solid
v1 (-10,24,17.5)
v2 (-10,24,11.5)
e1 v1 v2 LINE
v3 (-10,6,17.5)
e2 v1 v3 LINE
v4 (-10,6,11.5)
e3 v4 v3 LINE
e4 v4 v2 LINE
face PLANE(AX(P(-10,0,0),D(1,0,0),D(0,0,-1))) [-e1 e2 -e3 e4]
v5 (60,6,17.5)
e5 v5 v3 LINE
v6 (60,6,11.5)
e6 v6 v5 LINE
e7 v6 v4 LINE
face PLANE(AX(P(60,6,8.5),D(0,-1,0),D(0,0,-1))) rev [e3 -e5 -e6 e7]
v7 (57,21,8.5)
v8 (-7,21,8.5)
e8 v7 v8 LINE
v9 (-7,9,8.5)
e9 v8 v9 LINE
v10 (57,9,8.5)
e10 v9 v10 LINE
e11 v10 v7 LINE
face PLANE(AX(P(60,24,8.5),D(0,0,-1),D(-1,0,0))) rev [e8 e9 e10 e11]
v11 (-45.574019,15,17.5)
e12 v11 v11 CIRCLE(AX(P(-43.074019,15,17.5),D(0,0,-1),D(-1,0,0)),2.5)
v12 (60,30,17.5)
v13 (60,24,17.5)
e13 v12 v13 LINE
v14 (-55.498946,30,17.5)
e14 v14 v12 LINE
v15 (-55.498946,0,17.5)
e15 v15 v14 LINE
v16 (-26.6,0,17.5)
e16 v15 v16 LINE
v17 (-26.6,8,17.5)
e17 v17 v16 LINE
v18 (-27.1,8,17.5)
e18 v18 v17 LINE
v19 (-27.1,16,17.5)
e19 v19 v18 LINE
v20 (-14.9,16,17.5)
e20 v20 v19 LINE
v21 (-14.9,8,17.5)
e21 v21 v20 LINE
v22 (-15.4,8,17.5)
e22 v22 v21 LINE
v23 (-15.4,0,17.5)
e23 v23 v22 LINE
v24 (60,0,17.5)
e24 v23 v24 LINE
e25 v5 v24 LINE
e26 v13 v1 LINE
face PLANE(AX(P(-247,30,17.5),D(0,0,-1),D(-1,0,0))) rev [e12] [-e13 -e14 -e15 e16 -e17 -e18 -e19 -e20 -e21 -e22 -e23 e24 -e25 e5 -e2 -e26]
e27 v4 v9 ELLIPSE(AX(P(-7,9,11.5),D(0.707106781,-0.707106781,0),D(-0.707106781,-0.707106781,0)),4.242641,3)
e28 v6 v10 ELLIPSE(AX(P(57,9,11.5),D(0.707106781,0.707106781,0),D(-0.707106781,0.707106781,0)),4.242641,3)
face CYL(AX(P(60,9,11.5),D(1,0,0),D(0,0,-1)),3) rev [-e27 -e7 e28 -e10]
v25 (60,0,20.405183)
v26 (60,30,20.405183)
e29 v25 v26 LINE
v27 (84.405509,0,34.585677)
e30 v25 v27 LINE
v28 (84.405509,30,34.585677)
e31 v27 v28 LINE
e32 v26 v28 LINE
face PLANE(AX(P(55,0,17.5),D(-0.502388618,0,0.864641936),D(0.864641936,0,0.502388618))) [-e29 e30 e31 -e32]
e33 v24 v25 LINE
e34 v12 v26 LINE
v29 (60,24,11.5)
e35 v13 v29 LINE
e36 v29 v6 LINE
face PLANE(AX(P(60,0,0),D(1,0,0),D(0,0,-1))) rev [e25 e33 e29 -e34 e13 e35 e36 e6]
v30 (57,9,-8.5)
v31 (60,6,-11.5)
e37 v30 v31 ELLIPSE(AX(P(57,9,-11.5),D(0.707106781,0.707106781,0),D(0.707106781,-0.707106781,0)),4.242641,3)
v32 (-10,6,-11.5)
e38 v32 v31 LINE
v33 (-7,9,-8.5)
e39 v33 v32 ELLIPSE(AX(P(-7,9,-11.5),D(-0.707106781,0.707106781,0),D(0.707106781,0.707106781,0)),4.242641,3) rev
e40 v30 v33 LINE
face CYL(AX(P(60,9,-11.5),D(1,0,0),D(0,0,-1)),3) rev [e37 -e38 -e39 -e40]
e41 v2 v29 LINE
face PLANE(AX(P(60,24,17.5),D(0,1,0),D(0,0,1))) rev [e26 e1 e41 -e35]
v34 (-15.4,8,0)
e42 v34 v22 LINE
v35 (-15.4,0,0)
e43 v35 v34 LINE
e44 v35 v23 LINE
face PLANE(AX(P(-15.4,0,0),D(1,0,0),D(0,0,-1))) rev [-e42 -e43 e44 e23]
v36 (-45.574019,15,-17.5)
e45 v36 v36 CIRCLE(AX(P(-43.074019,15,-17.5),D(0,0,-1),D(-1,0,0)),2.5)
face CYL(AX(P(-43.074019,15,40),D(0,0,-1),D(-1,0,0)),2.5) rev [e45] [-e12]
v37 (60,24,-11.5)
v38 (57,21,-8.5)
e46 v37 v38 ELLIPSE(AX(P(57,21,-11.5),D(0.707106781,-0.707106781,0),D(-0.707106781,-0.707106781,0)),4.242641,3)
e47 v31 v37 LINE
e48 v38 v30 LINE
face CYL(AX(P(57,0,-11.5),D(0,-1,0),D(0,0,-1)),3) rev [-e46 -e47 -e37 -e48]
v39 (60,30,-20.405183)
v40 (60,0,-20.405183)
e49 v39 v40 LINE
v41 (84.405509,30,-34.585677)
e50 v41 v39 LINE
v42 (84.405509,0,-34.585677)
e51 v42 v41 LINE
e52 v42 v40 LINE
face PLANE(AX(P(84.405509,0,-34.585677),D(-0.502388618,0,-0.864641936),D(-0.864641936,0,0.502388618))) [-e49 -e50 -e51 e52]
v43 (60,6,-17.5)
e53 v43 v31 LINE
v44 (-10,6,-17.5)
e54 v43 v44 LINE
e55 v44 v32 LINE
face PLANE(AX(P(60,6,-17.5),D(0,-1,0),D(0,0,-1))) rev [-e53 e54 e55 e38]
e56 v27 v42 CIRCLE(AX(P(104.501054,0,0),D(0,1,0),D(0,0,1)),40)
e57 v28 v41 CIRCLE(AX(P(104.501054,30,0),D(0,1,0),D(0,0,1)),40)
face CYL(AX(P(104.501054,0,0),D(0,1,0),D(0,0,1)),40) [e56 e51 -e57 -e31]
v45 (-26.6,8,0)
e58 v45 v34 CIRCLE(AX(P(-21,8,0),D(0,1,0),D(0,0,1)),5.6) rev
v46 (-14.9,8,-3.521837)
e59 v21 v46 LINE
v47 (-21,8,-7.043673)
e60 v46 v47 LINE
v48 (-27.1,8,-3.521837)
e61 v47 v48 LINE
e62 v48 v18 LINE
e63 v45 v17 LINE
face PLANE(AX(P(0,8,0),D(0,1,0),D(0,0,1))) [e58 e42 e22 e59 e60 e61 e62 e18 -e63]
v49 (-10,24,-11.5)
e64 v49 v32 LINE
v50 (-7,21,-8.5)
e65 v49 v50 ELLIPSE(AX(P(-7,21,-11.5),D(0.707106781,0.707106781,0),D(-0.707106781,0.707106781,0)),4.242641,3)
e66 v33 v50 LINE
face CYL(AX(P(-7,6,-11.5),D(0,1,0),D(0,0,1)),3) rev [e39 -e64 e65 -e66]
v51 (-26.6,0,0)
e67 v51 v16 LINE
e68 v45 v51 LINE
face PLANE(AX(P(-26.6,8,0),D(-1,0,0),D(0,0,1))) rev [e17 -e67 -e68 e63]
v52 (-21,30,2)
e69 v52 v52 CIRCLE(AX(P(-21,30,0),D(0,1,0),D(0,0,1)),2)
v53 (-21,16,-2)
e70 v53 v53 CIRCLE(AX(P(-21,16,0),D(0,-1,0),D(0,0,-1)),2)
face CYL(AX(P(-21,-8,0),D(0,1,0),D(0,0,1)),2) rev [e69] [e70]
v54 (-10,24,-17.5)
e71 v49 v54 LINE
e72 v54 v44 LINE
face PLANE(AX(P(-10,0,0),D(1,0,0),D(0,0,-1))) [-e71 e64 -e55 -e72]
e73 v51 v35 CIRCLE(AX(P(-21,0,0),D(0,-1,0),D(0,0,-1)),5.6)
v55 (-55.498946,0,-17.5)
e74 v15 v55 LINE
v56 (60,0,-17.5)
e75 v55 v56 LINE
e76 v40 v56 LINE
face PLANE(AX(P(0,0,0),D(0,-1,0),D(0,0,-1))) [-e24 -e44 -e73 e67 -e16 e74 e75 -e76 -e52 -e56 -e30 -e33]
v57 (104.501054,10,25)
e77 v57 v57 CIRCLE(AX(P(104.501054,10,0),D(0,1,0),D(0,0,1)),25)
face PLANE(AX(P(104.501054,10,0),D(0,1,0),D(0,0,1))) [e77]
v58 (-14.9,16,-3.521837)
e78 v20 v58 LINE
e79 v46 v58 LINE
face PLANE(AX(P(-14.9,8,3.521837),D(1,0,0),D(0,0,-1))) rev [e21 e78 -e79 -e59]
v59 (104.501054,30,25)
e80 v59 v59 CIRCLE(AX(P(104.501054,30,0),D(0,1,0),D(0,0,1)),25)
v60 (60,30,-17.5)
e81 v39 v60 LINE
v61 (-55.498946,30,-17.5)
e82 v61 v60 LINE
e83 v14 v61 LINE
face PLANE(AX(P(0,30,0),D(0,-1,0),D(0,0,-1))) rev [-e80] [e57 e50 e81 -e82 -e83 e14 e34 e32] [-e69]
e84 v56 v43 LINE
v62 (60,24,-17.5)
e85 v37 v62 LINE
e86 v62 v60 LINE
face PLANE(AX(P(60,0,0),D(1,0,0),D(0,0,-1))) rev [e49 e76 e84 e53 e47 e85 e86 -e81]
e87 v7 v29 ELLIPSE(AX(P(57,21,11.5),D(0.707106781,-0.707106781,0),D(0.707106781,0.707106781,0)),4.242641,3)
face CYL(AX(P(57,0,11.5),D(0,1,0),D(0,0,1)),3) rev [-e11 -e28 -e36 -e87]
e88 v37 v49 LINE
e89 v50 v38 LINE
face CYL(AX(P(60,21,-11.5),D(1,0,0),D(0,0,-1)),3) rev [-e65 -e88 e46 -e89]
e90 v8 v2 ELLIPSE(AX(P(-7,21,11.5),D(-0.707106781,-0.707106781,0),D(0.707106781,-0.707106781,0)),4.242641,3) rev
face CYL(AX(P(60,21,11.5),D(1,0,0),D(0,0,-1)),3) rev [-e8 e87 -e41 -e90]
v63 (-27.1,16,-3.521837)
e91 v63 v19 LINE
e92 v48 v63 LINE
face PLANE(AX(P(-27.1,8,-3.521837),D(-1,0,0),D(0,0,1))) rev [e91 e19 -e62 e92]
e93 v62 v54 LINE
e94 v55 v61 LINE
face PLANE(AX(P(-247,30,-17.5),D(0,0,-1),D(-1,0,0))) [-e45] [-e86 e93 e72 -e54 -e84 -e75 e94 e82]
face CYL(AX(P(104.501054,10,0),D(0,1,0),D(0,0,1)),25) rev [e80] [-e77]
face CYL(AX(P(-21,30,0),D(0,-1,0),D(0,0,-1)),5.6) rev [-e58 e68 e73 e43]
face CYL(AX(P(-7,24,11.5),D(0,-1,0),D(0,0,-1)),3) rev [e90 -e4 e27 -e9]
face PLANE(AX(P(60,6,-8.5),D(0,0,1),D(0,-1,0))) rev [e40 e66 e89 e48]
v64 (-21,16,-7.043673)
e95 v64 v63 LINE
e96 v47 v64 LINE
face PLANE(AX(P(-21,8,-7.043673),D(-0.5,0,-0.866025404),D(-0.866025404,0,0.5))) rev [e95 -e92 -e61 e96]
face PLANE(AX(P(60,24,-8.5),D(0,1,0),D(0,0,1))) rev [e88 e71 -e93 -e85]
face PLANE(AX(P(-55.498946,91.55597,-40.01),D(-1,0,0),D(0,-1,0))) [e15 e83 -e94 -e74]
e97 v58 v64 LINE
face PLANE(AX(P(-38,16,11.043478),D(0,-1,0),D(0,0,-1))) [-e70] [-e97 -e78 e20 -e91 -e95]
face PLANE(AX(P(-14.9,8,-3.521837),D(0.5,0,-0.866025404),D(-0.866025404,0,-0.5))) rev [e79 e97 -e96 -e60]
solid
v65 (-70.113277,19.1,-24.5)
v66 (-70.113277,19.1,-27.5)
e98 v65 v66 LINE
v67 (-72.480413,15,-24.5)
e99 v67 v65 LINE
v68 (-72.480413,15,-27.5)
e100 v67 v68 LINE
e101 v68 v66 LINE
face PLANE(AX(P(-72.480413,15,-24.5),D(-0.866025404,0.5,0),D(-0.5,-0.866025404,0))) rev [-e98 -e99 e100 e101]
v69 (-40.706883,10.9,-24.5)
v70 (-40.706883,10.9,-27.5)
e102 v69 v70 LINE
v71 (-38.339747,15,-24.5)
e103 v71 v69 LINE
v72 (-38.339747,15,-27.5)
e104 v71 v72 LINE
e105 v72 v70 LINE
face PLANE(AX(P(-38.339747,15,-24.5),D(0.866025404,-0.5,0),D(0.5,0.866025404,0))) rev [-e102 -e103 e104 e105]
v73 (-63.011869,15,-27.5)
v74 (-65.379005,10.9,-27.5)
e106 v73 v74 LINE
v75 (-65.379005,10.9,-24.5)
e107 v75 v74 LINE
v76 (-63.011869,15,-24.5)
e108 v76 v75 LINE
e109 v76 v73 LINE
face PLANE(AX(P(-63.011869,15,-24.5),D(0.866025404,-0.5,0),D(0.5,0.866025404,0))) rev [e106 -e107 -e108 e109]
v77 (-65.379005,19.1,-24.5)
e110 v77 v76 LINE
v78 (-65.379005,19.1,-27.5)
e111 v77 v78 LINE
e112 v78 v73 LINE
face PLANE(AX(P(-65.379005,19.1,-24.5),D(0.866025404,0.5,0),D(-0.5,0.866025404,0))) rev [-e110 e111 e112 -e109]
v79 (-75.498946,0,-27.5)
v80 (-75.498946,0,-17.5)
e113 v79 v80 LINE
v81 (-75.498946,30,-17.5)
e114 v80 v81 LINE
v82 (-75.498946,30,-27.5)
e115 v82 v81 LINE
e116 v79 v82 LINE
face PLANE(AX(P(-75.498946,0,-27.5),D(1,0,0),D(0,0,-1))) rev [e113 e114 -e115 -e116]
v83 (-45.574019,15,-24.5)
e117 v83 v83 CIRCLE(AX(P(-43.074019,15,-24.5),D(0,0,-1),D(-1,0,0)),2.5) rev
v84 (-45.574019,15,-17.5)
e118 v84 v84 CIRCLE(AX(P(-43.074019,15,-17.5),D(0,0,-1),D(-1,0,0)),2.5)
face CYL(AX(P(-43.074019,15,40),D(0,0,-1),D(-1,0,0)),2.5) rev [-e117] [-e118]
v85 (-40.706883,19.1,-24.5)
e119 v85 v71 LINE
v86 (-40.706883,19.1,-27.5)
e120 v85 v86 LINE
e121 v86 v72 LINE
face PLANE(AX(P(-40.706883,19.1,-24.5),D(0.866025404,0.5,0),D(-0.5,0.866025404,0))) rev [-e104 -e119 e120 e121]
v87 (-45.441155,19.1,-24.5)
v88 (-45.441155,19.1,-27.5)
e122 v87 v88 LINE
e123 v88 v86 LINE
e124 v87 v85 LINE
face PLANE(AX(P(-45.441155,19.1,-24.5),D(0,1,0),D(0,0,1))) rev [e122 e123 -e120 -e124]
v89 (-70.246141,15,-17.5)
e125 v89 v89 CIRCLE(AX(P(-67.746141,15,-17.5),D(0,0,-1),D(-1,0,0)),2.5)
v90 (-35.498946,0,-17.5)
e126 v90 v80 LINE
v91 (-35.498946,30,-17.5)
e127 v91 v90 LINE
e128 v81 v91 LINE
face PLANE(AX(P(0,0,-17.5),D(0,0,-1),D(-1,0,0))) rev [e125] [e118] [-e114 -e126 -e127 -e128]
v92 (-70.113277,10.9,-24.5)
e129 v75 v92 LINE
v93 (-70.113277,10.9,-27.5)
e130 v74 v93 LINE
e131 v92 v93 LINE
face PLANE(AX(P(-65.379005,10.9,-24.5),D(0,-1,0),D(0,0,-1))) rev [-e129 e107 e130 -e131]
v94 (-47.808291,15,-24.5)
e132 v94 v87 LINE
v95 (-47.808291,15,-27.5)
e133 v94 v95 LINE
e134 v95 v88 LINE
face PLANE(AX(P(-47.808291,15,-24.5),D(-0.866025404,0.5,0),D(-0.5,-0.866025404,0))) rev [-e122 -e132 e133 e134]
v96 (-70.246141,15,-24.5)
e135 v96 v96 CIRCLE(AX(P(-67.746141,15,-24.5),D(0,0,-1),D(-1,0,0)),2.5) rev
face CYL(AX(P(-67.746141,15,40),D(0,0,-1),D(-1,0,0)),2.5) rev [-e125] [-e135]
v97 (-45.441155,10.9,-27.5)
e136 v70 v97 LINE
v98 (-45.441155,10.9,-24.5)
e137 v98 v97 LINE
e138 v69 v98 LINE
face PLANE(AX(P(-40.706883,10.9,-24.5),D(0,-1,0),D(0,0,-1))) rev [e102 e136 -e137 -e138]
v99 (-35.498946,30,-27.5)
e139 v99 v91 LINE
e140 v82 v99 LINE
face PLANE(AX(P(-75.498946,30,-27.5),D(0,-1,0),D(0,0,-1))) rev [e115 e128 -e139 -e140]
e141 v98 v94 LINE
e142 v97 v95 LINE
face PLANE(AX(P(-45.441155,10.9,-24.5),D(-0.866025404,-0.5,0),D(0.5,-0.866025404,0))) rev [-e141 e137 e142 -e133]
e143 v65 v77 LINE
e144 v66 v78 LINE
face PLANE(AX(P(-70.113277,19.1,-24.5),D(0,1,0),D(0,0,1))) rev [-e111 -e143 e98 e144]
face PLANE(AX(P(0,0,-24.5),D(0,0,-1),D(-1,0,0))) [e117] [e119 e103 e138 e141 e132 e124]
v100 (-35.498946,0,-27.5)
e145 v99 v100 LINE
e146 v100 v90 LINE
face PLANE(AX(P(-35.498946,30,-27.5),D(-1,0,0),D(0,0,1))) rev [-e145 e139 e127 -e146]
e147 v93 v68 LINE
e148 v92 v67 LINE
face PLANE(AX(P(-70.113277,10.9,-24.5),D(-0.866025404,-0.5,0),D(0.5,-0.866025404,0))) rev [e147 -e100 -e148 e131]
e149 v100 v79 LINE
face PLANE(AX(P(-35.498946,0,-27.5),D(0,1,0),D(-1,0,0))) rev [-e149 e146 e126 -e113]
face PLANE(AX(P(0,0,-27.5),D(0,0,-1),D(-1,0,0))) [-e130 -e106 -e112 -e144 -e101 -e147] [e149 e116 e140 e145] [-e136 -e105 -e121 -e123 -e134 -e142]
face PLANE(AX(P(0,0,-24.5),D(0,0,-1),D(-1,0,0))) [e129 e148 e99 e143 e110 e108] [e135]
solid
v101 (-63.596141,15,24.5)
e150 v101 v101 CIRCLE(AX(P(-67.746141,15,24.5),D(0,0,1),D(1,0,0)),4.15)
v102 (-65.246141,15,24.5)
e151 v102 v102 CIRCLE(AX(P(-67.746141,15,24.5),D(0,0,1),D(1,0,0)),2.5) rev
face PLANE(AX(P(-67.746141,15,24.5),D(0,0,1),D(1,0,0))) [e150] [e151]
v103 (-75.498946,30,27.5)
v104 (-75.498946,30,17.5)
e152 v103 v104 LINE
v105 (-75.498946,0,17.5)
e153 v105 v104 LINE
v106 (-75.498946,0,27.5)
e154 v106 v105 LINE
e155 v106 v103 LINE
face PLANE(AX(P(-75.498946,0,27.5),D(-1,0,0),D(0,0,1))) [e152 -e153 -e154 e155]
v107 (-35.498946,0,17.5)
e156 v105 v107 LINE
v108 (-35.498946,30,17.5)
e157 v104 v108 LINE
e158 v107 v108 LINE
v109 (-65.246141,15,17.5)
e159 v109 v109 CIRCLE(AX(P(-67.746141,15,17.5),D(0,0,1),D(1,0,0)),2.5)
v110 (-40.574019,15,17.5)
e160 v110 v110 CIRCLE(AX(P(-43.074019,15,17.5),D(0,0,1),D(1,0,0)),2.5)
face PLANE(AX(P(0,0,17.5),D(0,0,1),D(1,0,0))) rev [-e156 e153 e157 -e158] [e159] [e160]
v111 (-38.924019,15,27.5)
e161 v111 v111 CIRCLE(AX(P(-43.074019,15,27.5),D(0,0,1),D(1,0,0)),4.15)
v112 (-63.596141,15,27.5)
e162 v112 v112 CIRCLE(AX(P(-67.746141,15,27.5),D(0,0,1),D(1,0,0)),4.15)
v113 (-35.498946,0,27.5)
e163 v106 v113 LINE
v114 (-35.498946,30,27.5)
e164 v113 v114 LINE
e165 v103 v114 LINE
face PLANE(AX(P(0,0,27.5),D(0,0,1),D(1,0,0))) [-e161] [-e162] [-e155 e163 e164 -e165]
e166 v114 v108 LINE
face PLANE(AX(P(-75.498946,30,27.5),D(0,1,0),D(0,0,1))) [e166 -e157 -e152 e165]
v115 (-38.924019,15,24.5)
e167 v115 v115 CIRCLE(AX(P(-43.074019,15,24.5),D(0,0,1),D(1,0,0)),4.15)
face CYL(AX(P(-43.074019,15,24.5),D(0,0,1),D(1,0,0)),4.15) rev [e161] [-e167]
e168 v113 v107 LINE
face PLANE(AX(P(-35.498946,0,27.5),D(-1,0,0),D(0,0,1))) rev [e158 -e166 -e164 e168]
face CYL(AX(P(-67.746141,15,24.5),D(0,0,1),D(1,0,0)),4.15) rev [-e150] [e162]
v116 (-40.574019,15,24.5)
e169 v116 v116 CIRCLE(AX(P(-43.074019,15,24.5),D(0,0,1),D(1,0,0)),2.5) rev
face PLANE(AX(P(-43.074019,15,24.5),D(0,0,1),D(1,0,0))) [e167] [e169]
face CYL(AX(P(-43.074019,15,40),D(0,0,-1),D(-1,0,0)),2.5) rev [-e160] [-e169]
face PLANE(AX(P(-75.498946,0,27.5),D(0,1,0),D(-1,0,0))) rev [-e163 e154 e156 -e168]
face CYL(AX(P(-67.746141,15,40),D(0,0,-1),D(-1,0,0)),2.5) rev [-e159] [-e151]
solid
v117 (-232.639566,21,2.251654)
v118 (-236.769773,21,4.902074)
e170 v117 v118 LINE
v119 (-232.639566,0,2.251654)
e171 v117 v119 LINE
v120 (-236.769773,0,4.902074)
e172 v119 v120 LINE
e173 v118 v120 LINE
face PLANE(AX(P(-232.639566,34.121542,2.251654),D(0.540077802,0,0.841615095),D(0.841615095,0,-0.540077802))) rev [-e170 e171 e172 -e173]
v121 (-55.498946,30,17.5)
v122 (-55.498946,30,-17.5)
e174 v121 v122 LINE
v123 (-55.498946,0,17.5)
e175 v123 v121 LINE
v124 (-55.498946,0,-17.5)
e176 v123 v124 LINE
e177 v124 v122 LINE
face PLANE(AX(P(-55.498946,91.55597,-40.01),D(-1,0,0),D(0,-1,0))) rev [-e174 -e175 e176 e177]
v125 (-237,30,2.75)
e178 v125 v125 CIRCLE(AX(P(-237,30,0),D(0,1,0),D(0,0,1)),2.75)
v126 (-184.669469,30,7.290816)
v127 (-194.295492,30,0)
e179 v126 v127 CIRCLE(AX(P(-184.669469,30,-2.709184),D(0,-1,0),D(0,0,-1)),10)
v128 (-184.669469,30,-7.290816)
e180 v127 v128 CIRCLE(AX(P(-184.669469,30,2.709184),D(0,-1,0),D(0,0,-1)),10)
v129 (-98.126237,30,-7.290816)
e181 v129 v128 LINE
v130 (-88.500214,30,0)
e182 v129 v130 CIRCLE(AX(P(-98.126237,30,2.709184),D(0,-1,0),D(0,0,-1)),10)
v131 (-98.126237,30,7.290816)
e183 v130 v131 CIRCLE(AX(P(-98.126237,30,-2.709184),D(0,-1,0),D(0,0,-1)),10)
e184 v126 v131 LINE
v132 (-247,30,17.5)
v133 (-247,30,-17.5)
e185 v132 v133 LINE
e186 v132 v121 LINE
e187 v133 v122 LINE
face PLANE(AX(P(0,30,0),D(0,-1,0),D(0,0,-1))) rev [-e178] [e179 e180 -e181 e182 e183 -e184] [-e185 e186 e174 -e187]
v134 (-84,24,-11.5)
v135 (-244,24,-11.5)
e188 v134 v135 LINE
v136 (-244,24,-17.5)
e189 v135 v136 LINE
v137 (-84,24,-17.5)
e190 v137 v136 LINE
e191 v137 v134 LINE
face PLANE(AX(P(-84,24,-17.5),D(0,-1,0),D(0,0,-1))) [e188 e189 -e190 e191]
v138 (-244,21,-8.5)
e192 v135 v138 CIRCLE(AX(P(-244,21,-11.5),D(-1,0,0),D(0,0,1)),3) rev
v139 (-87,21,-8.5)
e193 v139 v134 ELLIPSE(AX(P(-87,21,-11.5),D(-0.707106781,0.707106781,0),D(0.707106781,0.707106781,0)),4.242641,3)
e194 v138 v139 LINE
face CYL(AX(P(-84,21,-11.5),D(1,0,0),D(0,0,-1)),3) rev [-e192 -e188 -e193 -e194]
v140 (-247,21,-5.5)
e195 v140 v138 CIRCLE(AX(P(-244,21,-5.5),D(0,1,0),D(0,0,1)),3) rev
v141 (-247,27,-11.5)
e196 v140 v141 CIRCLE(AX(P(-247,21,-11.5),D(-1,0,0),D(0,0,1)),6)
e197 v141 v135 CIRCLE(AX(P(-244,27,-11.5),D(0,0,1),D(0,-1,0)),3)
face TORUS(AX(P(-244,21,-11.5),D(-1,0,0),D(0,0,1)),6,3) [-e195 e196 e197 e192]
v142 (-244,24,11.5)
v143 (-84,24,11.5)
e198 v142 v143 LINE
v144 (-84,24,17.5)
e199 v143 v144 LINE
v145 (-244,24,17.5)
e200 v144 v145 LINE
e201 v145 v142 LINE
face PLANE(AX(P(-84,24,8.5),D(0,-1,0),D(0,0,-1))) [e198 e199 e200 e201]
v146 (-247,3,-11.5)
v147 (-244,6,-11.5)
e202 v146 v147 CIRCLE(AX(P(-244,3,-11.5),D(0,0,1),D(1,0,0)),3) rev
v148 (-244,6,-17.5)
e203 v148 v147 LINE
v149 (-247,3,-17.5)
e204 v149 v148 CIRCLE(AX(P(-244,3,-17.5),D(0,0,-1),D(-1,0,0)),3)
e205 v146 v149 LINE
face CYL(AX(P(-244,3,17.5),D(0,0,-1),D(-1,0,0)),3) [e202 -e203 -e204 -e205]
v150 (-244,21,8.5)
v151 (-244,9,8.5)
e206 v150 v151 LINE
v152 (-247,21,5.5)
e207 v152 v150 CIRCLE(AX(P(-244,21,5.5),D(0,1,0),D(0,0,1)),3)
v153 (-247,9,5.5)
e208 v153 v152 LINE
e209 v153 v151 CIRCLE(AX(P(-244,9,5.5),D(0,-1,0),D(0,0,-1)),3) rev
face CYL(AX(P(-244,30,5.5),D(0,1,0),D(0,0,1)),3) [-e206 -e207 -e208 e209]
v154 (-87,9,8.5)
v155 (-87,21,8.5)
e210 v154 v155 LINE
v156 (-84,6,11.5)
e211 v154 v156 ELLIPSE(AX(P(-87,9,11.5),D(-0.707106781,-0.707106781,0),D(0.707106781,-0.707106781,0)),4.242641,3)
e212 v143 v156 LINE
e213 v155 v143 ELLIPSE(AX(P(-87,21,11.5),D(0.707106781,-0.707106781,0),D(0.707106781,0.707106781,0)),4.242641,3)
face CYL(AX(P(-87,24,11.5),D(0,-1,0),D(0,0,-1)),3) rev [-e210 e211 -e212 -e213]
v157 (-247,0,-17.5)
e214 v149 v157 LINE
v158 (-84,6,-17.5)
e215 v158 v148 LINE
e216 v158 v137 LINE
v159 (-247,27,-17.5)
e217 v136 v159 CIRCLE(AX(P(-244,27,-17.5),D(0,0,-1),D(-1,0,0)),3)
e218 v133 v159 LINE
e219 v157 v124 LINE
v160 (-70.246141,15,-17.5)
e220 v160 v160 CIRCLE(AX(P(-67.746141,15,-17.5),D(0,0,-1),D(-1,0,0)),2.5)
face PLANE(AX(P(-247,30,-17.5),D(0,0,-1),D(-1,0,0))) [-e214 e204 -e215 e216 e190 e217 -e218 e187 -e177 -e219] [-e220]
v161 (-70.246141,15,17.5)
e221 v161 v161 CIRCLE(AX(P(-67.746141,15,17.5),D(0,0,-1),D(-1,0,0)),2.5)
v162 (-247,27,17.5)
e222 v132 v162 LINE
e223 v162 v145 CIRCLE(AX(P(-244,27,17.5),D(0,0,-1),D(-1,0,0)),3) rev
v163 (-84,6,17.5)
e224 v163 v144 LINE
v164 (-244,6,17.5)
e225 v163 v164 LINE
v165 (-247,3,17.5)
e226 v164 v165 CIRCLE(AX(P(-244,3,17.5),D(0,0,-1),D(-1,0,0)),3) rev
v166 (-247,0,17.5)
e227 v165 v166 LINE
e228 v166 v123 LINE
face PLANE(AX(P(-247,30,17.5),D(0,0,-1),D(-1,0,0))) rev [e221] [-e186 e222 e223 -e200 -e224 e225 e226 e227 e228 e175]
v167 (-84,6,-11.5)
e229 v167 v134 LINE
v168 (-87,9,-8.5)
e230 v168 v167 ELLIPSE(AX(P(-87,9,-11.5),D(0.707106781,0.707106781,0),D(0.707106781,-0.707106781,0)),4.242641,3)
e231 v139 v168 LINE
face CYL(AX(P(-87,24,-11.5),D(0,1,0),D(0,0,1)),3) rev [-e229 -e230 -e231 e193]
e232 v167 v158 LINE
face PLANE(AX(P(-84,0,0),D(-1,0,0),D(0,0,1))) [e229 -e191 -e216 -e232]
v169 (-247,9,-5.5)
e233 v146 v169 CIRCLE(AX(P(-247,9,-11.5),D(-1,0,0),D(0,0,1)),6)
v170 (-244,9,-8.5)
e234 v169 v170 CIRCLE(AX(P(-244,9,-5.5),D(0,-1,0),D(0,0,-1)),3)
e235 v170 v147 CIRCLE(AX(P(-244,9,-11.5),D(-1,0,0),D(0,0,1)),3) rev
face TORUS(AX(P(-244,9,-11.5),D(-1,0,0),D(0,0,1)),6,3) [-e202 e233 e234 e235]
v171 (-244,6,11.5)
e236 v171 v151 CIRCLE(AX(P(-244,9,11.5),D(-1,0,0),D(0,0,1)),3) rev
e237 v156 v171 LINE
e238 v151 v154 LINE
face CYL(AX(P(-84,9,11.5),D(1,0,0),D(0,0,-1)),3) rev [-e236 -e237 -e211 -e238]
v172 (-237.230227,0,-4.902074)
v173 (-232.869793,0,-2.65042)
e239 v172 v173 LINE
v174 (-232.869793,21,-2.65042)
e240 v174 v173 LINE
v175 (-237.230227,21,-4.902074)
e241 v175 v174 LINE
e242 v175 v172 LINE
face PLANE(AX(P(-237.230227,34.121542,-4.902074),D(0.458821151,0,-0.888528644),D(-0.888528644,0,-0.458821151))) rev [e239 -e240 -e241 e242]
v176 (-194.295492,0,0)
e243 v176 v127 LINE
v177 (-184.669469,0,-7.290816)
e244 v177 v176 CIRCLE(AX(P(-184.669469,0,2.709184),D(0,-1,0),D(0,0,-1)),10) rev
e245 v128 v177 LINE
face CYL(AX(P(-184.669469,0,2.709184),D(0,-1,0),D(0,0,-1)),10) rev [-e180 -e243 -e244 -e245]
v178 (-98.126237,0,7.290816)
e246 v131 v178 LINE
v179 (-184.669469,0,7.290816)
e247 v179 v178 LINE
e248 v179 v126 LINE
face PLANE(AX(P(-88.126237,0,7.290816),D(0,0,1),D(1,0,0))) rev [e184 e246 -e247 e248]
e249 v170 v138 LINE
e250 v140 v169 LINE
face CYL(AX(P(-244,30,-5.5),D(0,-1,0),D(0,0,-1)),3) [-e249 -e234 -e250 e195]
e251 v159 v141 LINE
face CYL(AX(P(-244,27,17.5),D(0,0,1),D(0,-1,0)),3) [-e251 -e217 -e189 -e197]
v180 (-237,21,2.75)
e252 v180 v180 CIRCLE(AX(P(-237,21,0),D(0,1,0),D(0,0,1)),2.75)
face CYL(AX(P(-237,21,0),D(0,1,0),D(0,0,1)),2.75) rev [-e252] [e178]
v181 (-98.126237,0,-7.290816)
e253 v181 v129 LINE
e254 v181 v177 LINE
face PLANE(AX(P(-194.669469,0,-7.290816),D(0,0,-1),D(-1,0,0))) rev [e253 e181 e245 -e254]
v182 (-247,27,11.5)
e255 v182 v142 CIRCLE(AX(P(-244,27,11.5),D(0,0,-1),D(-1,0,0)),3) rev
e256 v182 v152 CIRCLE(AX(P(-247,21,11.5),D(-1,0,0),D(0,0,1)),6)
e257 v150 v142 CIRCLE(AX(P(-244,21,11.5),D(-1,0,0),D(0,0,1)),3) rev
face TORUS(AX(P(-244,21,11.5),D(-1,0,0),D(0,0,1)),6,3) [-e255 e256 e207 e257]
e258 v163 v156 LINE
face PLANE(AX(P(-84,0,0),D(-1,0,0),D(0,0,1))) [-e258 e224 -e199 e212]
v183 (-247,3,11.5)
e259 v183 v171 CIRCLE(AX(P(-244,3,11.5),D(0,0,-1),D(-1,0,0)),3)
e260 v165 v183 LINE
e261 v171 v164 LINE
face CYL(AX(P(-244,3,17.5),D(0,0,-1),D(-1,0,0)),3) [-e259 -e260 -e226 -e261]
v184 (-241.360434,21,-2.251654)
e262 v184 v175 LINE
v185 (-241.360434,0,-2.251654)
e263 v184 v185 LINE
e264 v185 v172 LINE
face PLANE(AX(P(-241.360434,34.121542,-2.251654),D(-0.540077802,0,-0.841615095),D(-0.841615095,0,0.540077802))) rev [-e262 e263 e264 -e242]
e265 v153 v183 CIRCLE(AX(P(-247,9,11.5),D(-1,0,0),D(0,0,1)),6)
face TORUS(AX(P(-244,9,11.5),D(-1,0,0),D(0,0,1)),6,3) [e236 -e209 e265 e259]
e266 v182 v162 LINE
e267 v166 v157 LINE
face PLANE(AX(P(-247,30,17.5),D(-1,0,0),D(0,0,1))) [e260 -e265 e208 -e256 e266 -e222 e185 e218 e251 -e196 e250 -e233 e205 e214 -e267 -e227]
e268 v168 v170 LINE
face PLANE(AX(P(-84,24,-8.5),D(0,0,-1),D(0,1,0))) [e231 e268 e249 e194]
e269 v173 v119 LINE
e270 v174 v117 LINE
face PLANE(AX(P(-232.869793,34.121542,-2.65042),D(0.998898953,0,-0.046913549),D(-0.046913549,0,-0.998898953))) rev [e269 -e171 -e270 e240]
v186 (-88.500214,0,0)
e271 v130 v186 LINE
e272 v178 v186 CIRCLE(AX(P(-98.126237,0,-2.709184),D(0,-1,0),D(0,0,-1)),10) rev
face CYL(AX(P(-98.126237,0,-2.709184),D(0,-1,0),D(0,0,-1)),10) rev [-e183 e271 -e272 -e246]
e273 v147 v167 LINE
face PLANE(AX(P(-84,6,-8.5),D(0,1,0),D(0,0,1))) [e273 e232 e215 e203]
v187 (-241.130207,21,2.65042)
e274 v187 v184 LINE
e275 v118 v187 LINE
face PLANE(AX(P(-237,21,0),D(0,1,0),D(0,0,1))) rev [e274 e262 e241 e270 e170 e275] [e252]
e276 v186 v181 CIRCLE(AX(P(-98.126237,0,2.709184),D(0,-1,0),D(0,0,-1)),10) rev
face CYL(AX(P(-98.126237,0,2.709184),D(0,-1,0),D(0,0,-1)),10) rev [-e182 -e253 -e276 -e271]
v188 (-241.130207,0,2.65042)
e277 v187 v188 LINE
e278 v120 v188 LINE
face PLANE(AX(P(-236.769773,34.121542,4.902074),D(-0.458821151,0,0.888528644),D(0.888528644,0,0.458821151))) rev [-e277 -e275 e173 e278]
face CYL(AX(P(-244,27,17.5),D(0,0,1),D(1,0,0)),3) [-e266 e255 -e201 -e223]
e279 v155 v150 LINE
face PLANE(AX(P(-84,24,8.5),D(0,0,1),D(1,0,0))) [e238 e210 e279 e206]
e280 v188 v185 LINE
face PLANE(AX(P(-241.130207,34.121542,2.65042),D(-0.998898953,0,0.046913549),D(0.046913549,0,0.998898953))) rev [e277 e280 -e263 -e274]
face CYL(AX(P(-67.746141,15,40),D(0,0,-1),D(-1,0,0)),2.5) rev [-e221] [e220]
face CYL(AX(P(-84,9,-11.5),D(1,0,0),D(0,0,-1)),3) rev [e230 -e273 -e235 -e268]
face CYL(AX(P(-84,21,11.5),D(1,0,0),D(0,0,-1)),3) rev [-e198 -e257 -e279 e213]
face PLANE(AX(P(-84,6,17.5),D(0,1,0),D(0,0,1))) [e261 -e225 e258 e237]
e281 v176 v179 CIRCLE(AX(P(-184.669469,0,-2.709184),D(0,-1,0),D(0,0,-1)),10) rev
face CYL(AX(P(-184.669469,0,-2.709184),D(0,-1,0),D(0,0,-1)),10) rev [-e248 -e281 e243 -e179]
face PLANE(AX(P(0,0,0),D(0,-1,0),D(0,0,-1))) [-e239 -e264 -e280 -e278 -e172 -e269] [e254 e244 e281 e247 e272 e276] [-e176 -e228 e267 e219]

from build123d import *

# Parameters (mm, degrees)
SKETCH2_W                = 247
SKETCH2_H                = 35
BOSS_EXTRUDE1_DEPTH      = 30
SKETCH3_R                = 5.6
CUT_EXTRUDE1_DEPTH       = 250.429849858
CUT_EXTRUDE2_DEPTH       = 22
SKETCH6_W                = 22.496439662
SKETCH6_H                = 14
BOSS_EXTRUDE3_DEPTH      = 38
CUT_EXTRUDE4_DEPTH       = 17.5
SKETCH9_R                = 2
CUT_EXTRUDE5_DEPTH       = 38
SKETCH15_R               = 2.75
CUT_EXTRUDE10_DEPTH      = 9
CUT_EXTRUDE11_DEPTH      = 21
SKETCH19_W               = 35
SKETCH19_H               = 30
BOSS_EXTRUDE5_DEPTH      = 55
BOSS_EXTRUDE4_DEPTH      = 30
SKETCH21_R               = 25
CUT_EXTRUDE14_DEPTH      = 20
SPLIT1_SURFACE_1_BACK    = 401.716
SPLIT1_SURFACE_1_DEPTH   = 803.432
SPLIT1_SURFACE_2_BACK    = 401.716
SPLIT1_SURFACE_2_DEPTH   = 803.432
SKETCH24_W               = 40
SKETCH24_H               = 30
BOSS_EXTRUDE6_DEPTH      = 10
SKETCH26_W               = 40
SKETCH26_H               = 30
BOSS_EXTRUDE7_DEPTH      = 10
SKETCH27_R               = 2.5
CUT_EXTRUDE15_DEPTH      = 258.808553
CUT_EXTRUDE17_DEPTH      = 3
SKETCH32_R               = 4.15
CUT_EXTRUDE18_DEPTH      = 3
SKETCH33_W               = 48.781261606
SKETCH33_H               = 44.034445694
CUT_EXTRUDE19_DEPTH      = 163
CUT_EXTRUDE20_DEPTH      = 60
CUT_EXTRUDE20_DEPTH_BACK = 10
SKETCH34_W               = 48.781261606
SKETCH34_H               = 44.034445694
FILLET3_R                = 3
FILLET4_R                = 3
SKETCH29_W               = 106.543232212
SKETCH29_H               = 14.581631154
CUT_EXTRUDE16_DEPTH      = 253.00992044
FILLET2_R                = 10


with BuildPart() as part:
    # Sketch2 → Boss-Extrude1 (new body)
    with BuildSketch(Plane(origin=(0, 0, 0), x_dir=(1, 0, 0), z_dir=(0, 1, 0))):
        with Locations((-123.5, 0)):
            Rectangle(SKETCH2_W, SKETCH2_H)
    extrude(amount=BOSS_EXTRUDE1_DEPTH)

    # Sketch3 → Cut-Extrude1 (cut, through all)
    with BuildSketch(Plane.XZ):
        with Locations(Location((-21, 0, 0), (0, 0, 270))):
            Circle(SKETCH3_R)
    extrude(amount=-CUT_EXTRUDE1_DEPTH, mode=Mode.SUBTRACT)

    # Sketch4 → Cut-Extrude2 (cut)
    with BuildSketch(Plane(origin=(0, 30, 0), x_dir=(1, 0, 0), z_dir=(0, 1, 0))):
        Polygon((-14.9, 3.521836642), (-21, 7.043673284), (-27.1, 3.521836642), (-27.1, -3.521836642), (-21, -7.043673284), (-14.9, -3.521836642), align=None)
    extrude(amount=-CUT_EXTRUDE2_DEPTH, mode=Mode.SUBTRACT)

    # Sketch6 → Boss-Extrude3 (add)
    with BuildSketch(Plane(origin=(0, 0, 0), x_dir=(0, 0, -1), z_dir=(1, 0, 0))):
        with Locations((0.204742288, 23)):
            Rectangle(SKETCH6_W, SKETCH6_H)
    extrude(amount=-BOSS_EXTRUDE3_DEPTH)

    # Sketch7 → Cut-Extrude4 (cut)
    with BuildSketch(Plane.XY.offset(17.5)):
        Polygon((-21, 16), (-14.9, 16), (-14.9, 8), (-15.4, 8), (-15.4, 0), (-26.6, 0), (-26.6, 8), (-27.1, 8), (-27.1, 16), align=None)
    extrude(amount=-CUT_EXTRUDE4_DEPTH, mode=Mode.SUBTRACT)

    # Sketch9 → Cut-Extrude5 (cut)
    with BuildSketch(Plane(origin=(0, 30, 0), x_dir=(1, 0, 0), z_dir=(0, 1, 0))):
        with Locations(Location((-21, 0, 0), (0, 0, 270))):
            Circle(SKETCH9_R)
    extrude(amount=-CUT_EXTRUDE5_DEPTH, mode=Mode.SUBTRACT)

    # Sketch15 → Cut-Extrude10 (cut)
    with BuildSketch(Plane(origin=(0, 30, 0), x_dir=(1, 0, 0), z_dir=(0, 1, 0))):
        with Locations(Location((-237, 0, 0), (0, 0, 270))):
            Circle(SKETCH15_R)
    extrude(amount=-CUT_EXTRUDE10_DEPTH, mode=Mode.SUBTRACT)

    # Sketch16 → Cut-Extrude11 (cut)
    with BuildSketch(Plane.XZ):
        Polygon((-241.130206964, 2.650419546), (-241.36043414, -2.25165438), (-237.230227176, -4.902073926), (-232.869793036, -2.650419546), (-232.63956586, 2.25165438), (-236.769772824, 4.902073926), align=None)
    extrude(amount=-CUT_EXTRUDE11_DEPTH, mode=Mode.SUBTRACT)

    # Sketch19 → Boss-Extrude5 (add)
    with BuildSketch(Plane(origin=(0, 0, 0), x_dir=(0, 0, -1), z_dir=(1, 0, 0))):
        with Locations((0, 15)):
            Rectangle(SKETCH19_W, SKETCH19_H)
    extrude(amount=BOSS_EXTRUDE5_DEPTH)

    # Sketch18 → Boss-Extrude4 (add)
    with BuildSketch(Plane(origin=(0, 30, 0), x_dir=(1, 0, 0), z_dir=(0, 1, 0))):
        with BuildLine():
            Line((55, 17.5), (55, -17.5))
            Line((55, -17.5), (84.405509337, -34.58567742))
            ThreePointArc((84.405509337, -34.58567742), (144.501054052, 0), (84.405509337, 34.58567742))
            Line((84.405509337, 34.58567742), (55, 17.5))
        make_face()
    extrude(amount=-BOSS_EXTRUDE4_DEPTH)

    # Sketch21 → Cut-Extrude14 (cut)
    with BuildSketch(Plane(origin=(0, 30, 0), x_dir=(1, 0, 0), z_dir=(0, 1, 0))):
        with Locations(Location((104.501054052, 0, 0), (0, 0, 270))):
            Circle(SKETCH21_R)
    extrude(amount=-CUT_EXTRUDE14_DEPTH, mode=Mode.SUBTRACT)


with BuildPart() as body_2:
    # Split1: the piece behind the surface
    add(part.part)
    # Split1 surface: a surface, the sketch's curves swept straight by 803.432 mm
    with BuildLine(Plane.XY.offset(17.5).offset(-SPLIT1_SURFACE_1_BACK), mode=Mode.PRIVATE) as split1_surface_1_path:
        Line((-55.498945948, 91.555969674), (-55.498945948, -31.555969674))
    split1_surface_1 = Shell.extrude(split1_surface_1_path.wire(), (0 * SPLIT1_SURFACE_1_DEPTH, 0 * SPLIT1_SURFACE_1_DEPTH, 1 * SPLIT1_SURFACE_1_DEPTH))
    split(bisect_by=split1_surface_1, keep=Keep.BOTTOM)


with BuildPart() as part_1:
    add(part.part)

    # Split1: split by a surface, the side it looks to stays
    # Split1 surface: a surface, the sketch's curves swept straight by 803.432 mm
    with BuildLine(Plane.XY.offset(17.5).offset(-SPLIT1_SURFACE_2_BACK), mode=Mode.PRIVATE) as split1_surface_2_path:
        Line((-55.498945948, 91.555969674), (-55.498945948, -31.555969674))
    split1_surface_2 = Shell.extrude(split1_surface_2_path.wire(), (0 * SPLIT1_SURFACE_2_DEPTH, 0 * SPLIT1_SURFACE_2_DEPTH, 1 * SPLIT1_SURFACE_2_DEPTH))
    split(bisect_by=split1_surface_2, keep=Keep.TOP)


with BuildPart() as body_3:
    # Sketch24 → Boss-Extrude6 (new body)
    with BuildSketch(Plane.XY.offset(17.5)):
        with Locations((-55.498945948, 15)):
            Rectangle(SKETCH24_W, SKETCH24_H)
    extrude(amount=BOSS_EXTRUDE6_DEPTH)


with BuildPart() as body_4:
    # Sketch26 → Boss-Extrude7 (new body)
    with BuildSketch(Plane(origin=(0, 0, -17.5), x_dir=(-1, 0, 0), z_dir=(0, 0, -1))):
        with Locations((55.498945948, 15)):
            Rectangle(SKETCH26_W, SKETCH26_H)
    extrude(amount=BOSS_EXTRUDE7_DEPTH)


with BuildPart() as cut_extrude15_tool:
    # Sketch27 → Cut-Extrude15 (new, through all)
    with BuildSketch(Plane(origin=(0, 0, -27.5), x_dir=(-1, 0, 0), z_dir=(0, 0, -1))):
        with Locations((43.074019262, 15)):
            Circle(SKETCH27_R)
        with Locations((67.746141025, 15)):
            Circle(SKETCH27_R)
    extrude(amount=-CUT_EXTRUDE15_DEPTH)


with BuildPart() as part_2:
    add(part_1.part)

    # Cut-Extrude15: cut by cut_extrude15_tool
    add(cut_extrude15_tool.part, mode=Mode.SUBTRACT)

    # Sketch34 → Cut-Extrude20 (cut, two sides: drawn at the far end of the back side and taken through both)
    with BuildSketch(Plane(origin=(0, 0, 0), x_dir=(0, 0, -1), z_dir=(1, 0, 0)).offset(-CUT_EXTRUDE20_DEPTH_BACK)):
        with Locations((0, 15)):
            Rectangle(SKETCH34_W, SKETCH34_H)
        Polygon((-17.5, 30), (-17.5, 24), (-8.5, 24), (-8.5, 6), (-17.5, 6), (-17.5, 0), (17.5, 0), (17.5, 6), (8.5, 6), (8.5, 24), (17.5, 24), (17.5, 30), align=None, mode=Mode.SUBTRACT)
    extrude(amount=CUT_EXTRUDE20_DEPTH + CUT_EXTRUDE20_DEPTH_BACK, mode=Mode.SUBTRACT)

    # Fillet4
    fillet4_edges = [part_2.edges().sort_by_distance(p)[0] for p in [
        (-10, 15, 8.5),
        (25, 24, 8.5),
        (25, 6, 8.5),
        (60, 15, 8.5),
        (25, 6, -8.5),
        (25, 24, -8.5),
        (60, 15, -8.5),
        (-10, 15, -8.5),
    ]]
    fillet(fillet4_edges, radius=FILLET4_R)


with BuildPart() as body_2_1:
    add(body_2.part)

    # Cut-Extrude15: cut by cut_extrude15_tool
    add(cut_extrude15_tool.part, mode=Mode.SUBTRACT)

    # Sketch33 → Cut-Extrude19 (cut)
    with BuildSketch(Plane.ZY.offset(247)):
        with Locations((0, 15)):
            Rectangle(SKETCH33_W, SKETCH33_H)
        Polygon((-17.5, 30), (-17.5, 24), (-8.5, 24), (-8.5, 6), (-17.5, 6), (-17.5, 0), (17.5, 0), (17.5, 6), (8.5, 6), (8.5, 24), (17.5, 24), (17.5, 30), align=None, mode=Mode.SUBTRACT)
    extrude(amount=-CUT_EXTRUDE19_DEPTH, mode=Mode.SUBTRACT)

    # Fillet3
    fillet3_edges = [body_2_1.edges().sort_by_distance(p)[0] for p in [
        (-84, 15, 8.5),
        (-84, 15, -8.5),
        (-247, 24, 13),
        (-165.5, 24, 8.5),
        (-247, 15, 8.5),
        (-165.5, 6, 8.5),
        (-247, 6, 13),
        (-247, 6, -13),
        (-165.5, 6, -8.5),
        (-247, 15, -8.5),
        (-165.5, 24, -8.5),
        (-247, 24, -13),
    ]]
    fillet(fillet3_edges, radius=FILLET3_R)

    # Sketch29 → Cut-Extrude16 (cut, through all)
    with BuildSketch(Plane(origin=(0, 30, 0), x_dir=(1, 0, 0), z_dir=(0, 1, 0))):
        with Locations((-141.397853243, 0)):
            Rectangle(SKETCH29_W, SKETCH29_H)
    extrude(amount=-CUT_EXTRUDE16_DEPTH, mode=Mode.SUBTRACT)

    # Fillet2
    # the kernel refuses this fillet: 10 mm, written as the material it adds along each edge
    with BuildSketch(Plane(origin=(-194.669469349, 30, 7.290815577), x_dir=(0, 0, -1), z_dir=(0, -1, 0)), Plane(origin=(-194.669469349, 30, -7.290815577), x_dir=(1, 0, 0), z_dir=(0, -1, 0)), Plane(origin=(-88.126237137, 30, -7.290815577), x_dir=(0, 0, 1), z_dir=(0, -1, 0))) as fillet2_piece_1:
        with BuildLine():
            CenterArc((FILLET2_R, FILLET2_R), FILLET2_R, 180, 90)
            Line((0, FILLET2_R), (0, 0))
            Line((0, 0), (FILLET2_R, 0))
        make_face()
    extrude(amount=30)
    with BuildSketch(Plane(origin=(-88.126237137, 30, 7.290815577), x_dir=(0, 0, -1), z_dir=(0, -1, 0))) as fillet2_piece_2:
        with BuildLine():
            CenterArc((FILLET2_R, -FILLET2_R), FILLET2_R, 90, 90)
            Line((0, -FILLET2_R), (0, 0))
            Line((0, 0), (FILLET2_R, 0))
        make_face()
    extrude(amount=30)


with BuildPart() as body_3_1:
    add(body_3.part)

    # Cut-Extrude15: cut by cut_extrude15_tool
    add(cut_extrude15_tool.part, mode=Mode.SUBTRACT)

    # Sketch32 → Cut-Extrude18 (cut)
    with BuildSketch(Plane.XY.offset(27.5)):
        with Locations((-67.746141025, 15)):
            Circle(SKETCH32_R)
        with Locations((-43.074019262, 15)):
            Circle(SKETCH32_R)
    extrude(amount=-CUT_EXTRUDE18_DEPTH, mode=Mode.SUBTRACT)


with BuildPart() as body_4_1:
    add(body_4.part)

    # Cut-Extrude15: cut by cut_extrude15_tool
    add(cut_extrude15_tool.part, mode=Mode.SUBTRACT)

    # Sketch31 → Cut-Extrude17 (cut)
    with BuildSketch(Plane(origin=(0, 0, -27.5), x_dir=(-1, 0, 0), z_dir=(0, 0, -1))):
        Polygon((45.441155366, 10.9), (47.808291469, 15), (45.441155366, 19.1), (40.706883158, 19.1), (38.339747055, 15), (40.706883158, 10.9), align=None)
        Polygon((70.113277128, 10.9), (72.480413232, 15), (70.113277128, 19.1), (65.379004921, 19.1), (63.011868817, 15), (65.379004921, 10.9), align=None)
    extrude(amount=-CUT_EXTRUDE17_DEPTH, mode=Mode.SUBTRACT)


solid = Compound([part_2.part, body_2_1.part, body_3_1.part, body_4_1.part])
